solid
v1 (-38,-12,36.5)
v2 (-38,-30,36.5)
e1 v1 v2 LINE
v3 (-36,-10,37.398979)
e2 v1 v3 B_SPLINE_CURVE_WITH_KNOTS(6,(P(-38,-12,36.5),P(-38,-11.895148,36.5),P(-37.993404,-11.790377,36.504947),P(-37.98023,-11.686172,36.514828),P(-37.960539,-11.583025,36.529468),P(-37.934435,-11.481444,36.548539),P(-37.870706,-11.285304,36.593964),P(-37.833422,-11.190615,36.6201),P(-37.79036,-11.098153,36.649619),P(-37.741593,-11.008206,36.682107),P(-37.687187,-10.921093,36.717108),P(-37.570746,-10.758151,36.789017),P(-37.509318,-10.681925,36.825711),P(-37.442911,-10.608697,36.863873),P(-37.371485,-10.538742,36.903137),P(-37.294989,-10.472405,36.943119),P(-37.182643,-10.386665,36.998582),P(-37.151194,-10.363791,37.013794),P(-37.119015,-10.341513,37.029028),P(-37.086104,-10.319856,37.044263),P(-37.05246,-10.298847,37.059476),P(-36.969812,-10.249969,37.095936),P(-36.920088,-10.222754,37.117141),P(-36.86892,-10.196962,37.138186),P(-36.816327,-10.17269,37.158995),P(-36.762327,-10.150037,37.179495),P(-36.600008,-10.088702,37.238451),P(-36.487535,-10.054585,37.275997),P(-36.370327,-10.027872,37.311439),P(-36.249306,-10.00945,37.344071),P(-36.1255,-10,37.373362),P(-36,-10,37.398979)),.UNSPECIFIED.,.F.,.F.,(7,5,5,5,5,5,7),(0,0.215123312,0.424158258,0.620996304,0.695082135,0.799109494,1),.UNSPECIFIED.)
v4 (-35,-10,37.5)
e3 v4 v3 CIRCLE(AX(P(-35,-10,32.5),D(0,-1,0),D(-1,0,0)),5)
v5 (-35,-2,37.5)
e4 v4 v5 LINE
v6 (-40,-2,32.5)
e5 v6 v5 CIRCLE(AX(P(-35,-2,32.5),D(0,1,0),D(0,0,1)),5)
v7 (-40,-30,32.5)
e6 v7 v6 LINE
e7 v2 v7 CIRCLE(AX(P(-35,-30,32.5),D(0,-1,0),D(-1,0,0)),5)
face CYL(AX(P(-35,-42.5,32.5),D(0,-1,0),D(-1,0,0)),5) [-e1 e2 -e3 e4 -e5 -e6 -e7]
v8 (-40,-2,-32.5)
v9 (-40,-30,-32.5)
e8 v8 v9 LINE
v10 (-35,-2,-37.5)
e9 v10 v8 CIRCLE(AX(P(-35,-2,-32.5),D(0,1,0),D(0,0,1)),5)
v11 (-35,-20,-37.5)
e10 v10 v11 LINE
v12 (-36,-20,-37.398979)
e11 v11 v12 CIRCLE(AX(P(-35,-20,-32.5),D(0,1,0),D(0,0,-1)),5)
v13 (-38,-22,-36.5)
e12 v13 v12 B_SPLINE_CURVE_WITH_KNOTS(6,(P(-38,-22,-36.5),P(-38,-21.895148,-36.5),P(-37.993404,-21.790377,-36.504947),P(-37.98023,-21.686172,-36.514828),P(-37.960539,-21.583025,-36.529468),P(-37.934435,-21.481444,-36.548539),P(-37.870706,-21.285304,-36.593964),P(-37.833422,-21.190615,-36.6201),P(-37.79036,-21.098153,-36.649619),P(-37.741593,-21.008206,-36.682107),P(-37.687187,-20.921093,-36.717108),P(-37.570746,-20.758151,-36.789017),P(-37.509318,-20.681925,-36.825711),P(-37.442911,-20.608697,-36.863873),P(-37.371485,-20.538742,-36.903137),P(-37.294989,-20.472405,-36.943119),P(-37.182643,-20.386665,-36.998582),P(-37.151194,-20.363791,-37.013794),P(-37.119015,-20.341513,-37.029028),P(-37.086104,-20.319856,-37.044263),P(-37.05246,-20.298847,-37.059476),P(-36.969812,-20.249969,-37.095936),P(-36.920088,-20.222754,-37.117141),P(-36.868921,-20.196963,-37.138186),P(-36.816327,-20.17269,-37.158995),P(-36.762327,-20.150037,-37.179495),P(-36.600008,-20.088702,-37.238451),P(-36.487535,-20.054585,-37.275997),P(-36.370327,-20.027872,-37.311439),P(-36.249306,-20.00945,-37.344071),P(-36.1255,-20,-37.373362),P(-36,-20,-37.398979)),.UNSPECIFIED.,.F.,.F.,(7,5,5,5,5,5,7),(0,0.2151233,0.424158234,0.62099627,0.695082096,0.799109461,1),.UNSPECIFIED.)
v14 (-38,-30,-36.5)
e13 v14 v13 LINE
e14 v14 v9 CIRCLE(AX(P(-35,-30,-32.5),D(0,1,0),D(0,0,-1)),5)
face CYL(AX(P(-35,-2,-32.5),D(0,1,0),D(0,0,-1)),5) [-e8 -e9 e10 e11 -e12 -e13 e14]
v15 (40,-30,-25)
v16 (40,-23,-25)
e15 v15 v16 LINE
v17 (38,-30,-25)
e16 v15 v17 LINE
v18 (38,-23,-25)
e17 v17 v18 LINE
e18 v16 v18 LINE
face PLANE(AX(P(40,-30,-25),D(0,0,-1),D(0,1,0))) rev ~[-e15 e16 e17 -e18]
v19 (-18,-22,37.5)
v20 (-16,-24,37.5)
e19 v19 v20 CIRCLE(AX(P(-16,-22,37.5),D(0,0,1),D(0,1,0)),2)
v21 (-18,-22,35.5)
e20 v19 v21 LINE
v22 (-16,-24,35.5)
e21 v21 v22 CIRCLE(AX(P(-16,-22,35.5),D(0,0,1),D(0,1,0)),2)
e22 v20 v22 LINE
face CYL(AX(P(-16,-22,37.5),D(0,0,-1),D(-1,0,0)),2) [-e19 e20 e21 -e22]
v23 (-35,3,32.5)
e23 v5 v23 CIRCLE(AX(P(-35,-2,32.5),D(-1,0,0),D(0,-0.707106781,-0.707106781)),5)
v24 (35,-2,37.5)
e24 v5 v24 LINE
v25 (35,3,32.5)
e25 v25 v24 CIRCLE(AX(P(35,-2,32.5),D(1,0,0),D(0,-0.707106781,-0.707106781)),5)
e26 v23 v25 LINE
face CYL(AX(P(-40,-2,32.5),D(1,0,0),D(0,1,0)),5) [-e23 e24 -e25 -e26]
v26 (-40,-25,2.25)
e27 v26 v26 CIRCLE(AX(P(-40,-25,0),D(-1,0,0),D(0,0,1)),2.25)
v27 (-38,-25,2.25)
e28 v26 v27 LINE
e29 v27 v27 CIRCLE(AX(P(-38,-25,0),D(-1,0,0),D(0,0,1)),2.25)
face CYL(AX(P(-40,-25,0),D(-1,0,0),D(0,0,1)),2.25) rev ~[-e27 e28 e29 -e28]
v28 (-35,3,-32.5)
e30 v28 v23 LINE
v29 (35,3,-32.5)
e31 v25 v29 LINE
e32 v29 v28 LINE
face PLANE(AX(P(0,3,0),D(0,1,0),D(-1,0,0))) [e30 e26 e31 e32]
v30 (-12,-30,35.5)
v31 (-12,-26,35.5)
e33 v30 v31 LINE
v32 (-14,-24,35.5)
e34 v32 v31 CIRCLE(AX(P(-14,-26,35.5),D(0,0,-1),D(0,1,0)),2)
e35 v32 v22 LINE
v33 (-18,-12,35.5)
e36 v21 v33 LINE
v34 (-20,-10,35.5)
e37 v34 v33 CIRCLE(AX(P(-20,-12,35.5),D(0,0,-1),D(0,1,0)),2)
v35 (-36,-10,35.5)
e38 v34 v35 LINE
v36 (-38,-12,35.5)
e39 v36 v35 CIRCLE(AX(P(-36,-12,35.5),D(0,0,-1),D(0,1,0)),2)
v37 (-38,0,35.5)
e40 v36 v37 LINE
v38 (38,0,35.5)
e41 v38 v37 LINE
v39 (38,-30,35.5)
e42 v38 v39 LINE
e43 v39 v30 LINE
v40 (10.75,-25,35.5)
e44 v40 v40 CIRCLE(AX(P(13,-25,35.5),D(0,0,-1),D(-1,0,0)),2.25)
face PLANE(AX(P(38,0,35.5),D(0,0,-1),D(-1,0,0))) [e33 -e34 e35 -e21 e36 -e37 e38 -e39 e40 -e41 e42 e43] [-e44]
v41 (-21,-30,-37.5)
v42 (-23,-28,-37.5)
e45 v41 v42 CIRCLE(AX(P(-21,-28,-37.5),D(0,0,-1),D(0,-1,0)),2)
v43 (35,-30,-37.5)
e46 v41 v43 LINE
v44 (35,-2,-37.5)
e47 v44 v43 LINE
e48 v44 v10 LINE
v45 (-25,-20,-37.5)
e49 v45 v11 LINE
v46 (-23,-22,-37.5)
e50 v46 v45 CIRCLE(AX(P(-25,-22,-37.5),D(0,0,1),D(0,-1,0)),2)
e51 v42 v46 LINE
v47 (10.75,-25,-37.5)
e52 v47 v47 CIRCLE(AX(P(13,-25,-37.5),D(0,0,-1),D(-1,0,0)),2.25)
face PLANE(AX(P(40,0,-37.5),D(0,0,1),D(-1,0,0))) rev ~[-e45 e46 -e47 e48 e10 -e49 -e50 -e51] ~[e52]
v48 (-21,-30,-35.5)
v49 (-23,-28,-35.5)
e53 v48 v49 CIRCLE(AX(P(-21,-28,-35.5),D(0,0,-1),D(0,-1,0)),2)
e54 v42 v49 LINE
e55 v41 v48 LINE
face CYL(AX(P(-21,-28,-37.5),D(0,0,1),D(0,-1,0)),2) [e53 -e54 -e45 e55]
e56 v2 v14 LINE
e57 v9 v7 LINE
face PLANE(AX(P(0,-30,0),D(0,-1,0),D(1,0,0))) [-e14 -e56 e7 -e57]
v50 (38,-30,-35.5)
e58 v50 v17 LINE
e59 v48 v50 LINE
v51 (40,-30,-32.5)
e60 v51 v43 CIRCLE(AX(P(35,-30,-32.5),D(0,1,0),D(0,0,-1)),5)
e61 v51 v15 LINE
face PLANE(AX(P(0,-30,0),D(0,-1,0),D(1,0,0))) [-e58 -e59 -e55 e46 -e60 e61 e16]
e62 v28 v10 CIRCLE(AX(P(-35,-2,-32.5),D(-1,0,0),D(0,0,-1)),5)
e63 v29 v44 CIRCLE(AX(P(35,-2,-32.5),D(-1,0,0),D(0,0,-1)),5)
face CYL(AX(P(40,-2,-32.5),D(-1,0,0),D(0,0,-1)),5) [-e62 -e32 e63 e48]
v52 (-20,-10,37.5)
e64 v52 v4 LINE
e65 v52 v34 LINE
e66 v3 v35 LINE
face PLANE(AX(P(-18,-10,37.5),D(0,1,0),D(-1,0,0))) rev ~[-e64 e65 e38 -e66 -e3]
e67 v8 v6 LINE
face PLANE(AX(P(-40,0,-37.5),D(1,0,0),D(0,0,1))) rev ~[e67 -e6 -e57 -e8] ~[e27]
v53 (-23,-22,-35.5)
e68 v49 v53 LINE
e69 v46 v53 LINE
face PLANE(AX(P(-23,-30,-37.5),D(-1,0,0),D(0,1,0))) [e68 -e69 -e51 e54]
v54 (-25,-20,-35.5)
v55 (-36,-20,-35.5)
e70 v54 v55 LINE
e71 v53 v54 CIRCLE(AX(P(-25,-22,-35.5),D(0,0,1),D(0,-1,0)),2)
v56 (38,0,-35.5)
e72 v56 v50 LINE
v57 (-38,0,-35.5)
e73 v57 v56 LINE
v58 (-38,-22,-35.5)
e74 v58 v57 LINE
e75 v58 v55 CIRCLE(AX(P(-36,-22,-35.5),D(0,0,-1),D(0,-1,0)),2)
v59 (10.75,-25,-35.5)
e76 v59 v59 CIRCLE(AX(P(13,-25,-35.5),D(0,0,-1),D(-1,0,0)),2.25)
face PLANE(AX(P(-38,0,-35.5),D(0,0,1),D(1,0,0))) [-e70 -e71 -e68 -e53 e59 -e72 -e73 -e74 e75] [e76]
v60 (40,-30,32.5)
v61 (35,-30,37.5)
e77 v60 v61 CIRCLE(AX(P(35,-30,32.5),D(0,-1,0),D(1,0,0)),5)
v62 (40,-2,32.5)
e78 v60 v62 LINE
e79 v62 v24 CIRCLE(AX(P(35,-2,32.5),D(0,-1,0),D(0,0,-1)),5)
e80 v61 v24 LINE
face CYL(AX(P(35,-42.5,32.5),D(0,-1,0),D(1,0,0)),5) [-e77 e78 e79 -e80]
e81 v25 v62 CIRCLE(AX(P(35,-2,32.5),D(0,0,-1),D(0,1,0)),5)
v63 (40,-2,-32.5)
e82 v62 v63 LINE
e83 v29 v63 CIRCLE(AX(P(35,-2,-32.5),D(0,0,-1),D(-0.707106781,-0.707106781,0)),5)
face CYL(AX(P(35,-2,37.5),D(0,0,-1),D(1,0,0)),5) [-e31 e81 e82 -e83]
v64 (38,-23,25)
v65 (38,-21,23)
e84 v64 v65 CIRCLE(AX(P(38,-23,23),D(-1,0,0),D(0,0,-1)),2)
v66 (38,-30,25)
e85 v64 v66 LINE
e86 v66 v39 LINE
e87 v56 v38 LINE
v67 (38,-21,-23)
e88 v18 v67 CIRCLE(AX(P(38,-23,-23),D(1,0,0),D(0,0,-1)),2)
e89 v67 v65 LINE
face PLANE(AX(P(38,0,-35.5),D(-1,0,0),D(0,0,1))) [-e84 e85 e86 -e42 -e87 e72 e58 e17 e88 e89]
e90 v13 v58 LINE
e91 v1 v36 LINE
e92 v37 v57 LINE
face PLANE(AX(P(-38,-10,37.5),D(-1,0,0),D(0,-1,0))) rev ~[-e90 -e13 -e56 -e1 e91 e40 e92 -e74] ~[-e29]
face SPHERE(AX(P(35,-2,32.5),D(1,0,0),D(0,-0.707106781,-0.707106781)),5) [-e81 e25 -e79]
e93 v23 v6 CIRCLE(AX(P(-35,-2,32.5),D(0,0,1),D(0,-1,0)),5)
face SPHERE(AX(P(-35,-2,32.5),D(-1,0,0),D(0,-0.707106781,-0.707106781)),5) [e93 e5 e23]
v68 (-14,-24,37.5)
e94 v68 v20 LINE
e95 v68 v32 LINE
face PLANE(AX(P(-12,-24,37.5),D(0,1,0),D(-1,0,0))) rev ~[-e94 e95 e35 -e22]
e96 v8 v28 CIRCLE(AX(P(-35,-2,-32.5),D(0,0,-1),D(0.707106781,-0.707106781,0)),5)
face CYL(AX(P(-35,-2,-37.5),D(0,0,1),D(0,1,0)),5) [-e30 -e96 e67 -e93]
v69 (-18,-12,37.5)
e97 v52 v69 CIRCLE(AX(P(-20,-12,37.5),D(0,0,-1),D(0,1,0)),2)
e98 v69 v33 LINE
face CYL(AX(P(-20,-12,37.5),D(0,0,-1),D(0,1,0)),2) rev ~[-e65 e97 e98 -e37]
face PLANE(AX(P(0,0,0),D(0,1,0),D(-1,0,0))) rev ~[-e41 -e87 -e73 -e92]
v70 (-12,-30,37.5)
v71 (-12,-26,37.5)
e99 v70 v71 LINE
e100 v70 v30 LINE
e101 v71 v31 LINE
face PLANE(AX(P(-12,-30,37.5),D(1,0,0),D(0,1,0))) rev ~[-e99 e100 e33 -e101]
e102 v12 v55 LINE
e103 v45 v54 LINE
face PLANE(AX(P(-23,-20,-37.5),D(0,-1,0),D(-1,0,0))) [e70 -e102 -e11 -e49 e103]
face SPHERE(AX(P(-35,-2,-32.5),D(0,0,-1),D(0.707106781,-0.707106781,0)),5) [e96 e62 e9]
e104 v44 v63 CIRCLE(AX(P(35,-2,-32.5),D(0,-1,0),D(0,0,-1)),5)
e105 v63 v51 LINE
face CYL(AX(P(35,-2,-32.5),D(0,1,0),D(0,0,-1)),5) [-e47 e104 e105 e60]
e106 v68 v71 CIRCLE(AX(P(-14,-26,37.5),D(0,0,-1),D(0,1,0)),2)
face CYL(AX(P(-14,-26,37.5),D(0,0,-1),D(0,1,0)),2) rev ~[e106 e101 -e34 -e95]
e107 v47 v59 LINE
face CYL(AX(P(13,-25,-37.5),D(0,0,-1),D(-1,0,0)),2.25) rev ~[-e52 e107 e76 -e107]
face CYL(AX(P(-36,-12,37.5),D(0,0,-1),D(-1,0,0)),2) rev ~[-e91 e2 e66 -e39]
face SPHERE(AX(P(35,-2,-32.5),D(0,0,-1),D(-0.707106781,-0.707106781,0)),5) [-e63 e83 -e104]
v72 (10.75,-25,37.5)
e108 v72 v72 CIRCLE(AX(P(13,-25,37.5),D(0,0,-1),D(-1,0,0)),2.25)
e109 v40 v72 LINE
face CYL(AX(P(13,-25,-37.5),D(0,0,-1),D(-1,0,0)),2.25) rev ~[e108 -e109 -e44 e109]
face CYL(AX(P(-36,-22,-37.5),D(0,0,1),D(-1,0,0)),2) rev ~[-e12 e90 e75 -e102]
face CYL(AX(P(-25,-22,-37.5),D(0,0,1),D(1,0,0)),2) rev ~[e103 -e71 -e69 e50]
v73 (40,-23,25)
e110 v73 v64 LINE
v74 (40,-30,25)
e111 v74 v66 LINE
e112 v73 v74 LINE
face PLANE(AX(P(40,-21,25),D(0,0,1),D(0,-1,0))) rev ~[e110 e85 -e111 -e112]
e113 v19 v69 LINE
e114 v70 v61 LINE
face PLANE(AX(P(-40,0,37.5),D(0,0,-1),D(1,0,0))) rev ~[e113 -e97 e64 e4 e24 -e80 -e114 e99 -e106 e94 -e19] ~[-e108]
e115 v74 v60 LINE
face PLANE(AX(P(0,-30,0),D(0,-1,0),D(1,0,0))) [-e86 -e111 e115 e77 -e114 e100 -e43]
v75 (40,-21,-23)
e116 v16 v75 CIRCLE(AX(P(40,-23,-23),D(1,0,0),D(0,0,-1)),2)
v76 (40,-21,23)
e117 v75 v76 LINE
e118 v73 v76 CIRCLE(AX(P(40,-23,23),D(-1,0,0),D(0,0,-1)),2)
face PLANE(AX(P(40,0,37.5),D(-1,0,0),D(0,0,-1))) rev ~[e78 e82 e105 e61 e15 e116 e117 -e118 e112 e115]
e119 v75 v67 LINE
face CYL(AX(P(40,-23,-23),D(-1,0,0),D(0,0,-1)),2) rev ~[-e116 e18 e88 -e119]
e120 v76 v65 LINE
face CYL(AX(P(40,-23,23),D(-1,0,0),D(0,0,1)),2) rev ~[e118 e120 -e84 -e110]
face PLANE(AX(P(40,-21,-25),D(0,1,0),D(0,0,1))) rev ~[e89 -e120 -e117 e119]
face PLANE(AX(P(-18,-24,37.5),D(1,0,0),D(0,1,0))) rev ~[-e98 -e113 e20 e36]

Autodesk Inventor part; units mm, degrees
ref_plane "YZ Plane" through (0, 0, 0) normal (1, 0, 0) x (0, 1, 0)
ref_plane "XZ Plane" through (0, 0, 0) normal (0, 1, 0) x (-1, 0, 0)
ref_plane "XY Plane" through (0, 0, 0) normal (0, 0, 1) x (1, 0, 0)
sketch "Sketch1" plane through (0, 0, 0) normal (0, 1, 0) x (-1, 0, 0)
  line L0 (40, 37.5) -> (-40, 37.5)
  line L1 (-40, 37.5) -> (-40, -37.5)
  line L2 (-40, -37.5) -> (40, -37.5)
  line L3 (40, -37.5) -> (40, 37.5)
  line L4 (40, 37.5) -> (-40, -37.5) construction
  line L5 (-40, 37.5) -> (40, -37.5) construction
  point P0 (0, 0)
  dimension "d0" = 80
  dimension "d1" = 75
extrude "Extrusion1" add sketch "Sketch1" along normal blind 3
sketch "Sketch2" plane through (0, 0, 0) normal (0, -1, 0) x (1, 0, 0)
  line L0 (-38, -35.5) -> (38, -35.5)
  line L1 (38, -35.5) -> (38, 35.5)
  line L2 (38, 35.5) -> (-38, 35.5)
  line L3 (-38, 35.5) -> (-38, -35.5)
  line L4 (-38, -35.5) -> (38, 35.5) construction
  line L5 (38, -35.5) -> (-38, 35.5) construction
  line L6 (-40, -37.5) -> (-40, 37.5) projected
  line L7 (-40, 37.5) -> (40, 37.5) projected
  line L8 (-40, -37.5) -> (40, -37.5)
  line L9 (40, -37.5) -> (40, 37.5)
  line L10 (40, 37.5) -> (-40, 37.5)
  line L11 (-40, 37.5) -> (-40, -37.5)
  line L12 (-40, -37.5) -> (40, 37.5) construction
  line L13 (40, -37.5) -> (-40, 37.5) construction
  point P0 (0, 0)
  dimension "d4" = 2
  dimension "d5" = 2
extrude "Extrusion2" add sketch "Sketch2" along normal blind 30
sketch "Sketch3" plane through (40, 3, 37.5) normal (1, 0, 0) x (0, 0, -1)
  line L0 (73, -33) -> (2, -33) projected
  line L1 (12.5, -33) -> (62.5, -33)
  line L2 (62.5, -33) -> (62.5, -24)
  line L3 (62.5, -24) -> (12.5, -24)
  line L4 (12.5, -24) -> (12.5, -33)
  line L5 (75, -33) -> (75, 0) projected
  point P0 (37.5, -3)
  dimension "d8" = 50
  dimension "d9" = 9
  dimension "d10" = 12.5
extrude "Extrusion3" cut sketch "Sketch3" against normal up to surface (2 mm away)
sketch "Sketch4" plane through (-40, 3, 37.5) normal (0, 0, 1) x (1, 0, 0)
  line L0 (78, -33) -> (2, -33) projected
  line L1 (2, -33) -> (22, -33)
  line L2 (22, -33) -> (22, -13)
  line L3 (22, -13) -> (2, -13)
  line L4 (2, -13) -> (2, -33)
  line L5 (0, -33) -> (0, 0) projected
  line L6 (22, -33) -> (28, -33)
  line L7 (28, -33) -> (28, -27)
  line L8 (28, -27) -> (22, -27)
  line L9 (22, -27) -> (22, -33)
  point P0 (40, -3)
  point P1 (22, -27)
  dimension "d13" = 20
  dimension "d14" = 20
  dimension "d15" = 2
  dimension "d16" = 6
  dimension "d17" = 6
extrude "Extrusion4" cut sketch "Sketch4" against normal up to surface (2 mm away)
fillet "Fillet1" radius 2 4 edges at (-38, -10, 36.5) (-18, -10, 36.5) (-12, -24, 36.5) (-18, -24, 36.5)
fillet "Fillet2" radius 2 2 edges at (39, -21, 25) (39, -21, -25)
sketch "Sketch5" plane through (40, 3, -37.5) normal (0, 0, -1) x (-1, 0, 0)
  line L0 (2, -33) -> (78, -33) projected
  line L1 (78, -33) -> (63, -33)
  line L2 (63, -33) -> (63, -23)
  line L3 (63, -23) -> (78, -23)
  line L4 (78, -23) -> (78, -33)
  line L5 (80, -33) -> (80, 0) projected
  point P0 (40, -3)
  point P1 (78, -28)
  dimension "d22" = 15
  dimension "d23" = 10
  dimension "d24" = 2
extrude "Extrusion5" cut sketch "Sketch5" against normal up to surface (2 mm away)
fillet "Fillet3" radius 2 3 edges at (-38, -20, -36.5) (-23, -20, -36.5) (-23, -30, -36.5)
sketch "Sketch6" plane through (40, 3, -37.5) normal (0, 0, -1) x (-1, 0, 0)
  circle A0 centre (27, -28) radius 2.25
  line L0 (61, -33) -> (0, -33) projected
  line L1 (0, -33) -> (0, 0) projected
  point P0 (40, -3)
  dimension "d28" = 4.5
  dimension "d29" = 5
  dimension "d30" = 27
extrude "Extrusion6" cut sketch "Sketch6" against normal through all
sketch "Sketch7" plane through (-40, 3, -37.5) normal (-1, 0, 0) x (0, 0, 1)
  circle A0 centre (37.5, -28) radius 2.25
  line L0 (75, -33) -> (0, -33) projected
  line L1 (75, -33) -> (75, 0) projected
  point P0 (37.5, -3)
  dimension "d33" = 4.5
  dimension "d34" = 5
  dimension "d35" = 37.5
extrude "Extrusion7" cut sketch "Sketch7" against normal up to surface (2 mm away)
fillet "Fillet4" radius 5 4 edges at (-40, 3, 0) (0, 3, 37.5) (0, 3, -37.5) (40, 3, 0)
fillet "Fillet5" radius 5 8 edges at (38.5355, 1.5355, -36.0355) (40, -16, -37.5) (-38.5355, 1.5355, -36.0355) (-40, -16, -37.5) (-38.5355, 1.5355, 36.0355) (-40, -16, 37.5) (38.5355, 1.5355, 36.0355) (40, -16, 37.5)
properties part number "cable_box"
